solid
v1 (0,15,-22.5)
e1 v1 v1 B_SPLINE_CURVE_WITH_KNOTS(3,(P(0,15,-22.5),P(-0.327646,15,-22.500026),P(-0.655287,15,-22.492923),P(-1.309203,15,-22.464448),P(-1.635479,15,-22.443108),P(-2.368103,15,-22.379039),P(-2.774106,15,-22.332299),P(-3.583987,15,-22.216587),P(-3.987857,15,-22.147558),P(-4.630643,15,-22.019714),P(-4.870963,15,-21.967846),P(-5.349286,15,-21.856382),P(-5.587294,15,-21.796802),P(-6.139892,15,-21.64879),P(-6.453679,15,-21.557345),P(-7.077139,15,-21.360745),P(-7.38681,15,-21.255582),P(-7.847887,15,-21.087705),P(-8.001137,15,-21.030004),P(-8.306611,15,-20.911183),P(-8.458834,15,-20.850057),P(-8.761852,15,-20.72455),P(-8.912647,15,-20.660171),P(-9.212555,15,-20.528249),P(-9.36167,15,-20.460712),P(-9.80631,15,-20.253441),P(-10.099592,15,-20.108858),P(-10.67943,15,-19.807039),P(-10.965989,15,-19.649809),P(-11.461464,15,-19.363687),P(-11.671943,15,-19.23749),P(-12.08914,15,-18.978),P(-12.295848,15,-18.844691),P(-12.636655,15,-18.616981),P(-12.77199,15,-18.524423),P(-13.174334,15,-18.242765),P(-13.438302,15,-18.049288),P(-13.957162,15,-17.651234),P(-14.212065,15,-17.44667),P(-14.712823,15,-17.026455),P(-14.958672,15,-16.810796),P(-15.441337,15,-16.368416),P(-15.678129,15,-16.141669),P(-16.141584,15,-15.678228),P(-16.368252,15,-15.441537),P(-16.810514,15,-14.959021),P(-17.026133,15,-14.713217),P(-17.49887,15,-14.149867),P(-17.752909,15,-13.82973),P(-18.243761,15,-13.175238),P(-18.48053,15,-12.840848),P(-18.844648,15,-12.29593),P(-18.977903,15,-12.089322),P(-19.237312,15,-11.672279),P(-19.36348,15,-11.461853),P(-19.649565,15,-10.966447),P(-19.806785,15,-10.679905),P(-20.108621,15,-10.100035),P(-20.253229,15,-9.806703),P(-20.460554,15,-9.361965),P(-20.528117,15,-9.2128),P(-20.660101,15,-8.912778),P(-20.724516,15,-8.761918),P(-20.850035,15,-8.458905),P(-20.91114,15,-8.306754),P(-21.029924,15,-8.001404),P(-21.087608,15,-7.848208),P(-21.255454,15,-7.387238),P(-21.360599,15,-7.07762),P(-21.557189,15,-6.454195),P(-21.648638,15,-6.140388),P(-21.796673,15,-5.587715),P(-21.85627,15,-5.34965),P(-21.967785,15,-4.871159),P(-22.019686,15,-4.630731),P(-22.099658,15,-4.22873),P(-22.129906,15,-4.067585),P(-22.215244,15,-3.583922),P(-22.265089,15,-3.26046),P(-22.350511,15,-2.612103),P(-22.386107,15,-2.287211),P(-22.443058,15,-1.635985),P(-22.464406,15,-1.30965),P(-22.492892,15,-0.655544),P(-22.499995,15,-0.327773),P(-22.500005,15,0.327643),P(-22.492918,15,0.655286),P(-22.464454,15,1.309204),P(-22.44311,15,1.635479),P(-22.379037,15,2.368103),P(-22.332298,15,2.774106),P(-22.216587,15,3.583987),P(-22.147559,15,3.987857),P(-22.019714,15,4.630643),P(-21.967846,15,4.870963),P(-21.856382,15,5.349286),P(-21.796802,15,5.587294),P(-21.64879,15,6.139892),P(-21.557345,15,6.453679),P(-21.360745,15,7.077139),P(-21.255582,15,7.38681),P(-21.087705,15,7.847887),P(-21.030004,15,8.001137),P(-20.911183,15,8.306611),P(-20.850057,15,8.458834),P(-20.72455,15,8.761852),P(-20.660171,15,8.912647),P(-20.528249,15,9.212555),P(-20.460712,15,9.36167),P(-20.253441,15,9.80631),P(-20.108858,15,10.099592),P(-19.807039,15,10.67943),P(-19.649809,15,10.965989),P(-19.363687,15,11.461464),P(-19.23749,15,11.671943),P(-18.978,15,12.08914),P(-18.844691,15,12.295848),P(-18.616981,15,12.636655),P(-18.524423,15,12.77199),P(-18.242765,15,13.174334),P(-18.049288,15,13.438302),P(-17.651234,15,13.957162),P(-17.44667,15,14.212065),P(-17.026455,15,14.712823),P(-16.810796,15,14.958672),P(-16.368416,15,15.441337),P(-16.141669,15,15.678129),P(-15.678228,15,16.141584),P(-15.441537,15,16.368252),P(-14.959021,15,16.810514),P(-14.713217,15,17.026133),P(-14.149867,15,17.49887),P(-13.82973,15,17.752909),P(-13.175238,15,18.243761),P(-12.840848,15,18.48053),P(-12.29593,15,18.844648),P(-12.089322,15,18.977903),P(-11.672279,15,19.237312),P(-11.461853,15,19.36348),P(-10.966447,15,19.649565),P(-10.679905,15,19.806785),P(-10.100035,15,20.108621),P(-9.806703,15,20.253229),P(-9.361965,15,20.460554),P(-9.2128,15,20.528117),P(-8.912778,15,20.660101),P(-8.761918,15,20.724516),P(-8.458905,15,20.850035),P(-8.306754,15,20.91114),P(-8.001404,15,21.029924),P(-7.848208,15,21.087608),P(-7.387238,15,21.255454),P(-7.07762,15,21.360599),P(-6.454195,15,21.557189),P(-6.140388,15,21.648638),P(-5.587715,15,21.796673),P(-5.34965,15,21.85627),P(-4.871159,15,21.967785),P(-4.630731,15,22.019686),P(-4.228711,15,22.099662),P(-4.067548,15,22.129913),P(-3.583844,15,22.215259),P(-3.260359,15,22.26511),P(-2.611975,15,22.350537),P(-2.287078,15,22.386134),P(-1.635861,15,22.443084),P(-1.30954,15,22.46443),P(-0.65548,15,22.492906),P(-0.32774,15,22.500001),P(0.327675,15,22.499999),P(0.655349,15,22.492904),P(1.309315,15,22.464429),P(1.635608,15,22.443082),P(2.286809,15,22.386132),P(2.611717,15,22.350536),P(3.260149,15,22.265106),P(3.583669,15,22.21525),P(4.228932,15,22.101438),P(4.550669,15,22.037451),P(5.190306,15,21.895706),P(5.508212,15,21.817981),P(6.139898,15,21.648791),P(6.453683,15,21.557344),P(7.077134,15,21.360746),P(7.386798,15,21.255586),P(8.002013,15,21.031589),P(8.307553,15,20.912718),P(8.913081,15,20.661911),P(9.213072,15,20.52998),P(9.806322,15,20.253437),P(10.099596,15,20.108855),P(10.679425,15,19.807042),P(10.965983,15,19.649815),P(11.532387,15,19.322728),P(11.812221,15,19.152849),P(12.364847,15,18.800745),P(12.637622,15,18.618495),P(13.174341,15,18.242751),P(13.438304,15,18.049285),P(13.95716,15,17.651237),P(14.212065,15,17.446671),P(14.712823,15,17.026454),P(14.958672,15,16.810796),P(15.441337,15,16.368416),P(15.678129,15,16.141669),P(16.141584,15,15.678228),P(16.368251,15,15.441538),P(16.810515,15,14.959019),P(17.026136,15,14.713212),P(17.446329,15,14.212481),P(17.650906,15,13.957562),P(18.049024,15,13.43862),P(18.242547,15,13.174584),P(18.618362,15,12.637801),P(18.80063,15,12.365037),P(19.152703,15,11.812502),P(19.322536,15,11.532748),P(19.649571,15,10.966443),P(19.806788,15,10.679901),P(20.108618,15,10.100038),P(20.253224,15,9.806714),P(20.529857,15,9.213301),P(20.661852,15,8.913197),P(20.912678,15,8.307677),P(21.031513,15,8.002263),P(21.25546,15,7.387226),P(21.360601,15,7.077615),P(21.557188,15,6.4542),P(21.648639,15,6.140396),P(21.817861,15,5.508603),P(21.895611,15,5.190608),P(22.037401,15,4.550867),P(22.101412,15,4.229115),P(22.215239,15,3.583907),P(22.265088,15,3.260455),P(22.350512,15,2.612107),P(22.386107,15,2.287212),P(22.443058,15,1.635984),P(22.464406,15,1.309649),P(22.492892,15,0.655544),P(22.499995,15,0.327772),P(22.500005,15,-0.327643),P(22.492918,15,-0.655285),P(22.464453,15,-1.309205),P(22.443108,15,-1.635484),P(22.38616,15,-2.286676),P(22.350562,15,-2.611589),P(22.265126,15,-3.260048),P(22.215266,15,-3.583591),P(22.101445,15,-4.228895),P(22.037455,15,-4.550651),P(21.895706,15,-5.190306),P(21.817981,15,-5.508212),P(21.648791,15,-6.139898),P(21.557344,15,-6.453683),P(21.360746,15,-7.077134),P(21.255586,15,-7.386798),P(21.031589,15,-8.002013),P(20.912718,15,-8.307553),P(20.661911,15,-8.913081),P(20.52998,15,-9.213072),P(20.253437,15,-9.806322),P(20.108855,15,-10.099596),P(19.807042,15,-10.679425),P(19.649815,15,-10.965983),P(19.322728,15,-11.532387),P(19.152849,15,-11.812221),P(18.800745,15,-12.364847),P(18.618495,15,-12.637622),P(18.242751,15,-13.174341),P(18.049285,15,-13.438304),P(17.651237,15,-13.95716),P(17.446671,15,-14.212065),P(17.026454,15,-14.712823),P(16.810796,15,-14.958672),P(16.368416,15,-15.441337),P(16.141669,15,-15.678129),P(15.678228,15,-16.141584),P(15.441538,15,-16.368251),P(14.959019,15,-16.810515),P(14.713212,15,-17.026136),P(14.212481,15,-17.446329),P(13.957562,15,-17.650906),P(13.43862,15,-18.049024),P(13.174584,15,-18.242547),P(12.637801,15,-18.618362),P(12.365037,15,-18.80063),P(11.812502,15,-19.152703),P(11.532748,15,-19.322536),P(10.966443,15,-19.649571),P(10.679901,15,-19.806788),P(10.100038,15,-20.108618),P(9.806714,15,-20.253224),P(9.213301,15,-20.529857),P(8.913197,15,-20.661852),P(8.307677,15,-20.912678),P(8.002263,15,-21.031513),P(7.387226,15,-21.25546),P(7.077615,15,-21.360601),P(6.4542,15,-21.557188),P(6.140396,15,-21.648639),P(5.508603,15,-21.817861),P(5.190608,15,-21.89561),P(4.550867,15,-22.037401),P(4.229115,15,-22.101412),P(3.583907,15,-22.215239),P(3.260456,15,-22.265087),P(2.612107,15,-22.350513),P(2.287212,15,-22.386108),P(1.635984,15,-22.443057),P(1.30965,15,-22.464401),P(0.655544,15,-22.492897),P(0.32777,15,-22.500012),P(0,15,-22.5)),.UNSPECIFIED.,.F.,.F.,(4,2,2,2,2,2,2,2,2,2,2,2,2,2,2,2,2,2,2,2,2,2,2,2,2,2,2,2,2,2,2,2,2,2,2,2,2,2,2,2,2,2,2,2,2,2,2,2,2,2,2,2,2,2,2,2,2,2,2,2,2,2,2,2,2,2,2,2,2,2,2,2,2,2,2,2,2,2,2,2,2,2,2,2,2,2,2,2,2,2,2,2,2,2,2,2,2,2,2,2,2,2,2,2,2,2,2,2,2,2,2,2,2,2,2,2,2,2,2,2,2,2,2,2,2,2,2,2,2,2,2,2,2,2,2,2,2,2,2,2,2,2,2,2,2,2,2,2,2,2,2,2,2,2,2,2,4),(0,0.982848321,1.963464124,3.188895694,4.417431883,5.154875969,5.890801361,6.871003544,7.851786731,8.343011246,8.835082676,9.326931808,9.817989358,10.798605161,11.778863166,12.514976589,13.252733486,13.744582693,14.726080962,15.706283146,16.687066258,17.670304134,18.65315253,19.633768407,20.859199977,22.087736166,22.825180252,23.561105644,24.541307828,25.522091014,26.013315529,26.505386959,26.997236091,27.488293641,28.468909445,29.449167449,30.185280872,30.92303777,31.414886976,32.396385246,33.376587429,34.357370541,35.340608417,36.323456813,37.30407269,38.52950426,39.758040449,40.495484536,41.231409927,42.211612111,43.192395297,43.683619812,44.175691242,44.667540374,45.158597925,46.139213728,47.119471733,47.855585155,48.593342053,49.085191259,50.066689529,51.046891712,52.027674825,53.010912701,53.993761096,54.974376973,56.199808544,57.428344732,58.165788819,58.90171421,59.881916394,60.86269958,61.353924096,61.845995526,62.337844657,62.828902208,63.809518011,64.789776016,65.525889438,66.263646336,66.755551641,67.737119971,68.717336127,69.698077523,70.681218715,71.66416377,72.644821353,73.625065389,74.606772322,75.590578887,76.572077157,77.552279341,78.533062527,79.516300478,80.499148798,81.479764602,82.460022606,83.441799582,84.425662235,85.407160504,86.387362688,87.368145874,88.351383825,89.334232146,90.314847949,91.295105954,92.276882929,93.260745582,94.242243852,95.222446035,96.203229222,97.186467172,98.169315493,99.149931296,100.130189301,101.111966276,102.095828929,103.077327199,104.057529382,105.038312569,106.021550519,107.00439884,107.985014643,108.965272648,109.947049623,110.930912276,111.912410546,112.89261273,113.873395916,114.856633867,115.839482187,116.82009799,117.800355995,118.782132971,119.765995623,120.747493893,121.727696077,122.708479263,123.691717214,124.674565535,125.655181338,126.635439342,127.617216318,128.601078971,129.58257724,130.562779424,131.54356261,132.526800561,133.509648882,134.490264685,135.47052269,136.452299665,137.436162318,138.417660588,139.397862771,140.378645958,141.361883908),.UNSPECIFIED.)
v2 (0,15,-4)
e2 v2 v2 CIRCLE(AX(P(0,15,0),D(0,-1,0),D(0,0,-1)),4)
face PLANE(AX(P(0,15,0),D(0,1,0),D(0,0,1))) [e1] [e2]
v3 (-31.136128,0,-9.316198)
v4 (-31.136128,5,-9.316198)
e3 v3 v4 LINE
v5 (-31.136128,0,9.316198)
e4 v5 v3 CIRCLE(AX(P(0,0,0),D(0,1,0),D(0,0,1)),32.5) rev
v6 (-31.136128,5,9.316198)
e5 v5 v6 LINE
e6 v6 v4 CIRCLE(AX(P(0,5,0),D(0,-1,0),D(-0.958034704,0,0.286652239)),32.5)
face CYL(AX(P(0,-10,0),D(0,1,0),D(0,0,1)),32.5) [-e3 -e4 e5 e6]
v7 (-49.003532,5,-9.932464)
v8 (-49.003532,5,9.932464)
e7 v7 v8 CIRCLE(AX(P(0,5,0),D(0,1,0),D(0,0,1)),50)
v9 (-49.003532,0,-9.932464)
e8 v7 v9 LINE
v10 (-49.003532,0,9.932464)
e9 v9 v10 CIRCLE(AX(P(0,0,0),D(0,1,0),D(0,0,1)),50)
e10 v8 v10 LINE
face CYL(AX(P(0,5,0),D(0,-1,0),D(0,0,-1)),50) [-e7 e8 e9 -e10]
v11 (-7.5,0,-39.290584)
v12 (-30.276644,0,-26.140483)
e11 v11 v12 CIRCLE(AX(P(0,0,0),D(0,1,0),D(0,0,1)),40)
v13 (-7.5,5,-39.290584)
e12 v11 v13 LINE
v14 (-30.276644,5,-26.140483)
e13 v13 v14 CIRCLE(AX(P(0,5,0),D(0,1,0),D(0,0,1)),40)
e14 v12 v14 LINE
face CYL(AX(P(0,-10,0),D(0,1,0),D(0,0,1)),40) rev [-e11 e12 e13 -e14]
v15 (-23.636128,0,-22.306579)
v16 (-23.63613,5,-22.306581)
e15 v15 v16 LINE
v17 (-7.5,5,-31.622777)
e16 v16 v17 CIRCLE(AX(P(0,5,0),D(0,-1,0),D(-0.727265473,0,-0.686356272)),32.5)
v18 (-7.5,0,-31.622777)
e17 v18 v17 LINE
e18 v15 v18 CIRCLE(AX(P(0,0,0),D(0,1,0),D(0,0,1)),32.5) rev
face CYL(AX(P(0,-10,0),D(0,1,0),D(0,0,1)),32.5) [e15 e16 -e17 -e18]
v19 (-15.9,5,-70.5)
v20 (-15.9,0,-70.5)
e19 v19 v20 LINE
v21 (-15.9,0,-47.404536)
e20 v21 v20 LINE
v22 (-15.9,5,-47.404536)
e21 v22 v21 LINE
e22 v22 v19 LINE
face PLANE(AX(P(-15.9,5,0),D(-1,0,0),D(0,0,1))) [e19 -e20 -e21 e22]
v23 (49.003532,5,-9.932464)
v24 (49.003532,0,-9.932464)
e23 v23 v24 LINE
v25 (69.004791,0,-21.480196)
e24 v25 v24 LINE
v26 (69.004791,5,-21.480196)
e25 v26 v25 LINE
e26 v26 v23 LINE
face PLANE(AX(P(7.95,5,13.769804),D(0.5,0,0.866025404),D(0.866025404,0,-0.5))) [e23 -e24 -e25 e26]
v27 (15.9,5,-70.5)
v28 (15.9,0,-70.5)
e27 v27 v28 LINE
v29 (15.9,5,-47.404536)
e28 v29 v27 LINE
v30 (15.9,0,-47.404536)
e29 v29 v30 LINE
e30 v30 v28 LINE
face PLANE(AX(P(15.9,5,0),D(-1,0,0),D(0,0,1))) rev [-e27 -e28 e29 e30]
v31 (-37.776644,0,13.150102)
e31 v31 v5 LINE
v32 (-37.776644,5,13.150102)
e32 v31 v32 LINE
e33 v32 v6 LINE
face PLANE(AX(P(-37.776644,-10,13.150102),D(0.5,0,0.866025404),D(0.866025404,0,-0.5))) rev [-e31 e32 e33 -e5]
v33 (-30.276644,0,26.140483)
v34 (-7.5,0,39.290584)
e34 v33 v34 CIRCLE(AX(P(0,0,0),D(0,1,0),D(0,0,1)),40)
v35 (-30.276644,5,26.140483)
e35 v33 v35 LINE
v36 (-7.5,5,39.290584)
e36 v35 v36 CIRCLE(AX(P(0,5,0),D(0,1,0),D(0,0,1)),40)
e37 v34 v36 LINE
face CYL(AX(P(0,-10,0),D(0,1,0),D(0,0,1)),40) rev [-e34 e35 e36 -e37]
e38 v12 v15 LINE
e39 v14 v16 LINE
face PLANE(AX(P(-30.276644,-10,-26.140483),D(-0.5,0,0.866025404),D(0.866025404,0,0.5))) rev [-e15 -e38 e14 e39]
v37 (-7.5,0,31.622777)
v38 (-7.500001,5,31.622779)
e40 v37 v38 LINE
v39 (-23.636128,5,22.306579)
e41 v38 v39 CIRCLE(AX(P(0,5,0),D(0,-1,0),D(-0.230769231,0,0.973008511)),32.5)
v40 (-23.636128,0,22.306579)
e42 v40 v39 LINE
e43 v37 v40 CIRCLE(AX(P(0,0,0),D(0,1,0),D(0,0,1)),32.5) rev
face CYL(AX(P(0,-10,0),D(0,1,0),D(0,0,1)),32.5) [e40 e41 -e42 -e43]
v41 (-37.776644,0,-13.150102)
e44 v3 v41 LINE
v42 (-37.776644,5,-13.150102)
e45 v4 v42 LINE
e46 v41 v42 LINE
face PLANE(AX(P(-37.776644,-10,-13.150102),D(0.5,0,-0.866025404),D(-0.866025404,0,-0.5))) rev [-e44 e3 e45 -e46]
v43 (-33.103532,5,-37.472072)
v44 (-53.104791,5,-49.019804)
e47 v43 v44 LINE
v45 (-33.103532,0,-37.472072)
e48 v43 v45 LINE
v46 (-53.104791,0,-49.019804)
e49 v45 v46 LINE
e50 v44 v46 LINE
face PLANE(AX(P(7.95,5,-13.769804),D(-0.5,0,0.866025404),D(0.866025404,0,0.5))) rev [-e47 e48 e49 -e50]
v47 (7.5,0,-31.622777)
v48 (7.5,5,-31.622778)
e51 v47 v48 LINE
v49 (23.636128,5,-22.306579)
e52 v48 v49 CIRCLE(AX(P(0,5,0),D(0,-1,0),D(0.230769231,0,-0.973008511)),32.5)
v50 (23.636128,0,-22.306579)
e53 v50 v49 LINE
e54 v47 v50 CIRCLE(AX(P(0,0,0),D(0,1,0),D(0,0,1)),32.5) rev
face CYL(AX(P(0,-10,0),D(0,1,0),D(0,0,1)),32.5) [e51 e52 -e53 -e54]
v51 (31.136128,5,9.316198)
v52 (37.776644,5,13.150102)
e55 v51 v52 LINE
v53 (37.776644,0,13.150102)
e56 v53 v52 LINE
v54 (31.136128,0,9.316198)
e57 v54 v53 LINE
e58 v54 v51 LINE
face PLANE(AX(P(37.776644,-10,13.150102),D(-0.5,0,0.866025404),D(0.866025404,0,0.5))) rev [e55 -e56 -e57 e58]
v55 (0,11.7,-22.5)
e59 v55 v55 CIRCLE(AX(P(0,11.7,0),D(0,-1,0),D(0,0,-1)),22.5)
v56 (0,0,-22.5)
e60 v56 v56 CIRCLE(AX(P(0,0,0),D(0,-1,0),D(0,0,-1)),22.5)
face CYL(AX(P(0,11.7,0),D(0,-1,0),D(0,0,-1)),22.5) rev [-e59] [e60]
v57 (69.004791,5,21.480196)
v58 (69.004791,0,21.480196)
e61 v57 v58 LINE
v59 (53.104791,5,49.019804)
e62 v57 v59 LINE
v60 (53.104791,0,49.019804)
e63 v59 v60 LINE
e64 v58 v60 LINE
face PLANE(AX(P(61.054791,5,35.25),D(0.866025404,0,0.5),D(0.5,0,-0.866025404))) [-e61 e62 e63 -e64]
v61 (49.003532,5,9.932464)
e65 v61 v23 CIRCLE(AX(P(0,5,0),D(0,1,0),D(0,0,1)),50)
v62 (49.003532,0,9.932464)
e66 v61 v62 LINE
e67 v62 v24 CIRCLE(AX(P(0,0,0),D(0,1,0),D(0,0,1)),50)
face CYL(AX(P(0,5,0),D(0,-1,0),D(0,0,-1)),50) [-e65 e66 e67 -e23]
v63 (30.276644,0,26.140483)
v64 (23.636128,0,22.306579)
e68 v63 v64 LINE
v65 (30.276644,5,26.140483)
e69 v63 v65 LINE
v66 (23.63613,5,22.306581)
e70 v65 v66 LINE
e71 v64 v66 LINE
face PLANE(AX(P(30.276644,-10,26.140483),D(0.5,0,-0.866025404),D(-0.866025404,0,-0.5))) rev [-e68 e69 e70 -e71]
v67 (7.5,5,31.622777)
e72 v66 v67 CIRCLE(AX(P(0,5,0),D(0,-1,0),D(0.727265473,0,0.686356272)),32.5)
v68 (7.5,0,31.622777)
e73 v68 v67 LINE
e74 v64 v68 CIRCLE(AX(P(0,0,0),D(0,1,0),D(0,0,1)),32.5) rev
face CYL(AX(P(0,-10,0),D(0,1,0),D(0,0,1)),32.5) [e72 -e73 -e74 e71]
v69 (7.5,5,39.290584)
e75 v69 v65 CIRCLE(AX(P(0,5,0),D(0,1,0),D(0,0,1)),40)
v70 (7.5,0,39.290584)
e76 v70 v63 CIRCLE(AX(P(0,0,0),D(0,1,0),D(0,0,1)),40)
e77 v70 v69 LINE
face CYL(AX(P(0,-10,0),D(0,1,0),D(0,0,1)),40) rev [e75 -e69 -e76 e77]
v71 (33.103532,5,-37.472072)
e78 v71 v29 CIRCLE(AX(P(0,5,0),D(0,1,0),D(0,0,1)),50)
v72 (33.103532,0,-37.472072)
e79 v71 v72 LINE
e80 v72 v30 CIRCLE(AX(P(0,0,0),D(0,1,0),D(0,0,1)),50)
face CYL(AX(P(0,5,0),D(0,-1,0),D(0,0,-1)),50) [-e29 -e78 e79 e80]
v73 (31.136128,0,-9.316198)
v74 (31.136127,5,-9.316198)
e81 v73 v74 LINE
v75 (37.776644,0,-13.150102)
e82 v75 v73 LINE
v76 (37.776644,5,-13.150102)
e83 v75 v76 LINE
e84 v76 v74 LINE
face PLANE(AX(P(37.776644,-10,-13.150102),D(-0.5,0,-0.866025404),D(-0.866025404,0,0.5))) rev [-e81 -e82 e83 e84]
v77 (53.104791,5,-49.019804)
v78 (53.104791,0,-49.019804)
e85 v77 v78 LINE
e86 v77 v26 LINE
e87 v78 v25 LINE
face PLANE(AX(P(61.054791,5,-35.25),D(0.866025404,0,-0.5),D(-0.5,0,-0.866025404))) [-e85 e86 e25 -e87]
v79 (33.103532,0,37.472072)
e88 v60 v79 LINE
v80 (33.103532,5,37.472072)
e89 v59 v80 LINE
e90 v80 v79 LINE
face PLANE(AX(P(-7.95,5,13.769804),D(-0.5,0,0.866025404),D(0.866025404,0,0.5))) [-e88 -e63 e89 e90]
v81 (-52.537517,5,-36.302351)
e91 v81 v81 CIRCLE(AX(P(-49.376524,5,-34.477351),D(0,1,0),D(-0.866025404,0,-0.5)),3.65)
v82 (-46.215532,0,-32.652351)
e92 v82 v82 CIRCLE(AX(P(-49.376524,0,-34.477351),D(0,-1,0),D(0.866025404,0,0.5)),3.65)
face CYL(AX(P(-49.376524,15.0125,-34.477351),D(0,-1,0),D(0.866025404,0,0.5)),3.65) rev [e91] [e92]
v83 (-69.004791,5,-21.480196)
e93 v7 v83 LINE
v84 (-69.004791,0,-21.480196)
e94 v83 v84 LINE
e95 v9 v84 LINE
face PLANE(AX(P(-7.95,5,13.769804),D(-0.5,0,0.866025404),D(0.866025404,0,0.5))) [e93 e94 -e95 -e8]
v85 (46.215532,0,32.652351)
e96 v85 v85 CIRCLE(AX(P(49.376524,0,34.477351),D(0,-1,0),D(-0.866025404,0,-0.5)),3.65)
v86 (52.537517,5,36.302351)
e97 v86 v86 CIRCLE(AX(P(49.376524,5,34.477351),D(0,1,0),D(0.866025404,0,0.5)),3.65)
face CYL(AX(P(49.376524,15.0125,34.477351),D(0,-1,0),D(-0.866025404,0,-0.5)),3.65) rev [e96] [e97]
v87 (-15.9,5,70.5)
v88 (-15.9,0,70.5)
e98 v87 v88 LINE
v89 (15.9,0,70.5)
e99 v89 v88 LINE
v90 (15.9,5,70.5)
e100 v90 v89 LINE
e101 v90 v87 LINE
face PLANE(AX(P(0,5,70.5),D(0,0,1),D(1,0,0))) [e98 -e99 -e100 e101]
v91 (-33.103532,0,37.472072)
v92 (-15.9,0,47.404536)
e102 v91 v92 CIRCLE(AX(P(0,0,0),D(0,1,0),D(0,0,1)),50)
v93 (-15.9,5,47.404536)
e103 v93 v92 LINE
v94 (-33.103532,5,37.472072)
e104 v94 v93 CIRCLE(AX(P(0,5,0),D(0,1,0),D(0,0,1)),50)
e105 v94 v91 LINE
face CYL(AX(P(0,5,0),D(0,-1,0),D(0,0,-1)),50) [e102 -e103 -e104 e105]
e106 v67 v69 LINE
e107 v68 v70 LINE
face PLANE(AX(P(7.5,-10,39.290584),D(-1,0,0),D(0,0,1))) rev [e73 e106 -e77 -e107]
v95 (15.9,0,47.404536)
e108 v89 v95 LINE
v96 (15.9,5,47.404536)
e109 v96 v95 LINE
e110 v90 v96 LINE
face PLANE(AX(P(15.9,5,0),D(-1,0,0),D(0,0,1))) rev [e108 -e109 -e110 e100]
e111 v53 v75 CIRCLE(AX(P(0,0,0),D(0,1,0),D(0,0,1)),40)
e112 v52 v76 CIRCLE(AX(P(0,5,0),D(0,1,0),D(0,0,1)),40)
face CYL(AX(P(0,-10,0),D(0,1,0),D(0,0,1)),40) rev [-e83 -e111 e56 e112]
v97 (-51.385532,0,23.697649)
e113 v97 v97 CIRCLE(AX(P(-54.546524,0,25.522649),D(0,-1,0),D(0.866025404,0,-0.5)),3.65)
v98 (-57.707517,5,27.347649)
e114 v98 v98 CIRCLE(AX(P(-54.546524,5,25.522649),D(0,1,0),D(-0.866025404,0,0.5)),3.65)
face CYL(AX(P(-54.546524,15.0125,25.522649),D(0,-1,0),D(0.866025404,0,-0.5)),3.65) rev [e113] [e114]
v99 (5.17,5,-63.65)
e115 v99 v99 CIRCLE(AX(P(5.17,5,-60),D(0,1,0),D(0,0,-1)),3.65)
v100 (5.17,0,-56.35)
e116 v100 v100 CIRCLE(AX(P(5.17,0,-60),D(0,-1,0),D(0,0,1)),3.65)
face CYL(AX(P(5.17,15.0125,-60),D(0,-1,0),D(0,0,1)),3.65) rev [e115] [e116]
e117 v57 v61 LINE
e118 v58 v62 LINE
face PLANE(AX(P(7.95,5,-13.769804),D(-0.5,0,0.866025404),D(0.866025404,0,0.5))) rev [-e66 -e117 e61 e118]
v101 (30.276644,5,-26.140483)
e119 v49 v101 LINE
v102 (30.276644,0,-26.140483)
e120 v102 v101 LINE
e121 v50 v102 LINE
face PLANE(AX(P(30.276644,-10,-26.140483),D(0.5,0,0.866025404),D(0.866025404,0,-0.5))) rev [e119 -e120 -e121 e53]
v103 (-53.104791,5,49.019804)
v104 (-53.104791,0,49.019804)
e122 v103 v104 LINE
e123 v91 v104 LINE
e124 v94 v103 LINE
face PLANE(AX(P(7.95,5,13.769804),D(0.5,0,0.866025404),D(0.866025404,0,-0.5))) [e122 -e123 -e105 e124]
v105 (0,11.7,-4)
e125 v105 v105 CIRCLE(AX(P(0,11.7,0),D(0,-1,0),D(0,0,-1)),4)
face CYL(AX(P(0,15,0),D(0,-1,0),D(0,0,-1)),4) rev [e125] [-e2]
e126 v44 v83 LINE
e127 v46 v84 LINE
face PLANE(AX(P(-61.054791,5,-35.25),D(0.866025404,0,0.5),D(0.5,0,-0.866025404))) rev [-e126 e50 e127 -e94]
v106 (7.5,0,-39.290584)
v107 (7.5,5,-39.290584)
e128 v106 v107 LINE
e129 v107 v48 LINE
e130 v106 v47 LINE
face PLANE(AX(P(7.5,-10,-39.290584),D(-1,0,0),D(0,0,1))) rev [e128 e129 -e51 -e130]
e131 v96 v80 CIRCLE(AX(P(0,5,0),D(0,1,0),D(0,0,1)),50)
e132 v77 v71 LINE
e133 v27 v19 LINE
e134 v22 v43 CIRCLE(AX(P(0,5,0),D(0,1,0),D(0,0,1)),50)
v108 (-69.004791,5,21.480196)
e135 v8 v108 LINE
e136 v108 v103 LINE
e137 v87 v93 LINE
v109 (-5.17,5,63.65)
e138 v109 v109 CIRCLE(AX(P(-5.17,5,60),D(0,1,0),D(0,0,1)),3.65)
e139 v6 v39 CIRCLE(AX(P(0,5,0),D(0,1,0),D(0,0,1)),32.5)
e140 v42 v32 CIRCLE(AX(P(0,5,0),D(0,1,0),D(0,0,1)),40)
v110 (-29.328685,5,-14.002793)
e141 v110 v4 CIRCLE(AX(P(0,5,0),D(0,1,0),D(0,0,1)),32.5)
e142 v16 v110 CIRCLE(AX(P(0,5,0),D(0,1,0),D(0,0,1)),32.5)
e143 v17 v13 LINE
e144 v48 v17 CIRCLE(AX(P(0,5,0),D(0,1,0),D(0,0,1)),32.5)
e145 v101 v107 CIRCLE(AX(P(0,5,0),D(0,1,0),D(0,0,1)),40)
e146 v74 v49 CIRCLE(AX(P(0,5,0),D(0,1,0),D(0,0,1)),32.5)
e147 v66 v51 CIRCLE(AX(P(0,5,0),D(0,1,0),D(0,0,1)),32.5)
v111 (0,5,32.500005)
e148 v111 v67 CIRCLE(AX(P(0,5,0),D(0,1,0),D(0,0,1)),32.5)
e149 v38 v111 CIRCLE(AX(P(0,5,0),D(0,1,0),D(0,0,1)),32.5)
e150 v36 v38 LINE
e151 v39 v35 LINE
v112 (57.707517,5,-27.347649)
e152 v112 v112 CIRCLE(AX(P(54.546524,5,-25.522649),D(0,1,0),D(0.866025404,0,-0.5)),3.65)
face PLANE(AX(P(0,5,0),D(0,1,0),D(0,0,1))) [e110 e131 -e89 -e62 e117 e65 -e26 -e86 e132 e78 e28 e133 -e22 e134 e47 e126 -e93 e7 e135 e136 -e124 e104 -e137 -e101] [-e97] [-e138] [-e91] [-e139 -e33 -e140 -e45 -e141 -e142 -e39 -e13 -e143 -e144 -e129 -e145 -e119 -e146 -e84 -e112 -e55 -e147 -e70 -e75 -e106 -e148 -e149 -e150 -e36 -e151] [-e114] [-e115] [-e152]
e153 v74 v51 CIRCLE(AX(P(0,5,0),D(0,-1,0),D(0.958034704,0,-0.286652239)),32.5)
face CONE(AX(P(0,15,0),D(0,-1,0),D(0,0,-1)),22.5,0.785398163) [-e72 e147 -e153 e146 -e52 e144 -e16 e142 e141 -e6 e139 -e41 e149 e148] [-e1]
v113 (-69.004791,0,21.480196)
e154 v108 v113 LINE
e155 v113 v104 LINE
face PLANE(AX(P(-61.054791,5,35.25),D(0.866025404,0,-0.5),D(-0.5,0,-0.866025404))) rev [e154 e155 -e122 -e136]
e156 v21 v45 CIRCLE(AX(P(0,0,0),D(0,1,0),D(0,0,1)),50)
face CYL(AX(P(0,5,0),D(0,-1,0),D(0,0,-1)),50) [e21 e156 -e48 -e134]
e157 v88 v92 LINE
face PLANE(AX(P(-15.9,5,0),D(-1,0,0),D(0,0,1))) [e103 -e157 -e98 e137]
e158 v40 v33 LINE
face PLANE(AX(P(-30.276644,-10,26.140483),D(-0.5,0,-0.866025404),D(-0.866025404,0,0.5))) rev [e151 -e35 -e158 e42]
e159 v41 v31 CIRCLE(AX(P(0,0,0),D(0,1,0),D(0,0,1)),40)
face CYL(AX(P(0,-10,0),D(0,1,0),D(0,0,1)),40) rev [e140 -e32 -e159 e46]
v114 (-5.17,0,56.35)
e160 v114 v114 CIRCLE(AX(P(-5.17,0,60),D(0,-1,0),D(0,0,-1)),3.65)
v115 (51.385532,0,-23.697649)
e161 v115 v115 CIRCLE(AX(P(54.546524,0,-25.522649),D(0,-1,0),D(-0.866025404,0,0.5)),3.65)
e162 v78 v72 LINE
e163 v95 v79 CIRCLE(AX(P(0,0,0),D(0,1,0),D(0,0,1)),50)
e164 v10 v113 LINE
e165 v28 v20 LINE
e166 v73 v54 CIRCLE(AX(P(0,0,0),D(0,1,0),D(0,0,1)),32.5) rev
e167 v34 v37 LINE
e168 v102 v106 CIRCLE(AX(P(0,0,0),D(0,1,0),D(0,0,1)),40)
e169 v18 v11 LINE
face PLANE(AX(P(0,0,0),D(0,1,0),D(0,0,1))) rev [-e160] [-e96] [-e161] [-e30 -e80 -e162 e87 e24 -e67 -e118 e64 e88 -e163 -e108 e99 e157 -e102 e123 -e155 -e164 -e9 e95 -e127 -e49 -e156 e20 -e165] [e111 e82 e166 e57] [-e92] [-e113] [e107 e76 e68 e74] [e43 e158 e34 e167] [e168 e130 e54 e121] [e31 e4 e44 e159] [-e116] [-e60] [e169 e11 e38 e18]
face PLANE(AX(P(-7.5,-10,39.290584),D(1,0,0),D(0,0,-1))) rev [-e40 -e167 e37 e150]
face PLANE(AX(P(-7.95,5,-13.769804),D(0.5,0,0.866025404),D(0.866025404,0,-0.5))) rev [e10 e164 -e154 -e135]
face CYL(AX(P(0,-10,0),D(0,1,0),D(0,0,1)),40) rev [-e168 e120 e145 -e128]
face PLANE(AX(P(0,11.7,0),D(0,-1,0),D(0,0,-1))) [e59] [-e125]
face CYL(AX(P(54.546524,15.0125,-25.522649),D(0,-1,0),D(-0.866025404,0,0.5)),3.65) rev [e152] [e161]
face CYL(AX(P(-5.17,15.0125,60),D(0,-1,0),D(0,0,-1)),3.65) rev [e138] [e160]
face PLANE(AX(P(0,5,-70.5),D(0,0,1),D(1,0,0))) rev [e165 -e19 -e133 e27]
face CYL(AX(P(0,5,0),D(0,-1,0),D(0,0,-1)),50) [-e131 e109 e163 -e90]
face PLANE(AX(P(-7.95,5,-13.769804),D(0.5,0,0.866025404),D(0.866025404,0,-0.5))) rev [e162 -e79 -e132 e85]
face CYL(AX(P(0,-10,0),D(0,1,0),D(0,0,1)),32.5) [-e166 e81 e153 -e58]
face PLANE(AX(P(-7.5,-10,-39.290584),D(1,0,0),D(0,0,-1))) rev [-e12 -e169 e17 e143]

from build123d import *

# Parameters (mm, degrees)
BOSS_EXTRUDE1_DEPTH = 5
CIRPATTERN1_COUNT   = 3
CIRPATTERN1_ANGLE   = 120
SKETCH8_R           = 22.5
BOSS_EXTRUDE4_DEPTH = 10
SKETCH11_R          = 22.5
CUT_EXTRUDE4_DEPTH  = 11.7
SKETCH12_R          = 4
CUT_EXTRUDE5_DEPTH  = 3.3
SKETCH14_R          = 3.65
CUT_EXTRUDE7_DEPTH  = 100.784323589
CIRPATTERN2_COUNT   = 6
CUT_EXTRUDE9_DEPTH  = 15


# Read off the part's stored shape, not the designer's step: Boundary2
with BuildPart() as part:
    # Sketch1 → Boss-Extrude1 (new body)
    with BuildSketch(Plane(origin=(0, 0, 0), x_dir=(1, 0, 0), z_dir=(0, 1, 0))):
        with BuildLine():
            ThreePointArc((-15.9, 47.404535648), (-50, 0), (-15.9, -47.404535648))
            Line((-15.9, -47.404535648), (-15.9, 47.404535648))
        make_face()
        with BuildLine():
            ThreePointArc((-15.9, -47.404535648), (0, -50), (15.9, -47.404535648))
            Line((15.9, -47.404535648), (15.9, 47.404535648))
            ThreePointArc((15.9, 47.404535648), (0, 50), (-15.9, 47.404535648))
            Line((-15.9, 47.404535648), (-15.9, -47.404535648))
        make_face()
        with BuildLine():
            Line((-15.9, -70.5), (15.9, -70.5))
            Line((15.9, -70.5), (15.9, -47.404535648))
            ThreePointArc((15.9, -47.404535648), (0, -50), (-15.9, -47.404535648))
            Line((-15.9, -47.404535648), (-15.9, -70.5))
        make_face()
        with BuildLine():
            ThreePointArc((-15.9, 47.404535648), (0, 50), (15.9, 47.404535648))
            Line((15.9, 47.404535648), (15.9, 70.5))
            Line((15.9, 70.5), (-15.9, 70.5))
            Line((-15.9, 70.5), (-15.9, 47.404535648))
        make_face()
        with BuildLine():
            Line((15.9, 47.404535648), (15.9, -47.404535648))
            ThreePointArc((15.9, -47.404535648), (40.589407485, -29.197602641), (50, 0))
            ThreePointArc((50, 0), (40.589407485, 29.197602641), (15.9, 47.404535648))
        make_face()
    boss_extrude1 = extrude(amount=BOSS_EXTRUDE1_DEPTH)

    # CirPattern1: Boss-Extrude1 ×3 about axis
    cirpattern1_axis = Axis((0, 0, 0), (0, 1, 0))
    for i in range(1, CIRPATTERN1_COUNT):
        add(boss_extrude1.rotate(cirpattern1_axis, i * CIRPATTERN1_ANGLE / (CIRPATTERN1_COUNT - 1)))

    # Sketch8 → Boss-Extrude4 (add)
    with BuildSketch(Plane(origin=(0, 5, 0), x_dir=(1, 0, 0), z_dir=(0, 1, 0))):
        with Locations(Location((0, 0, 0), (0, 0, 270))):
            Circle(SKETCH8_R)
    extrude(amount=BOSS_EXTRUDE4_DEPTH)

    # Boundary2 outline → Boundary2 (revolve)
    with BuildSketch(Plane.XY):
        Polygon((32.5, 5), (22.499998072, 15.000001928), (22.5, 5), align=None)
    revolve(axis=Axis((0, 0, 0), (0, 1, 0)))

    # Sketch11 → Cut-Extrude4 (cut)
    with BuildSketch(Plane.XZ):
        with Locations(Location((0, 0, 0), (0, 0, 270))):
            Circle(SKETCH11_R)
    extrude(amount=-CUT_EXTRUDE4_DEPTH, mode=Mode.SUBTRACT)

    # Sketch12 → Cut-Extrude5 (cut)
    with BuildSketch(Plane.XZ.offset(-11.7)):
        with Locations(Location((0, 0, 0), (0, 0, 270))):
            Circle(SKETCH12_R)
    extrude(amount=-CUT_EXTRUDE5_DEPTH, mode=Mode.SUBTRACT)

    # Sketch14 → Cut-Extrude7 (cut, through all)
    with BuildSketch(Plane(origin=(0, 0, 0), x_dir=(-1, 0, 0), z_dir=(0, -1, 0))):
        with Locations(Location((5.17, -60, 0), (0, 0, 90))):
            Circle(SKETCH14_R)
    cut_extrude7 = extrude(amount=-CUT_EXTRUDE7_DEPTH, mode=Mode.SUBTRACT)

    # CirPattern2: Cut-Extrude7 ×6 about axis
    cirpattern2_axis = Axis((0, 0, 0), (0, 1, 0))
    for i in range(1, CIRPATTERN2_COUNT):
        add(cut_extrude7.rotate(cirpattern2_axis, i * 360 / CIRPATTERN2_COUNT), mode=Mode.SUBTRACT)

    # Sketch15 → Cut-Extrude9 (cut)
    with BuildSketch(Plane(origin=(0, 5, 0), x_dir=(1, 0, 0), z_dir=(0, 1, 0))):
        with BuildLine():
            Line((-37.776643972, 13.150101528), (-31.136127875, 9.316197772))
            ThreePointArc((-31.136127875, 9.316197772), (-32.5, 0), (-31.136127875, -9.316197772))
            Line((-31.136127875, -9.316197772), (-37.776643972, -13.150101528))
            ThreePointArc((-37.776643972, -13.150101528), (-40, 0), (-37.776643972, 13.150101528))
        make_face()
        with BuildLine():
            Line((-30.276643972, 26.140482585), (-23.636127875, 22.306578829))
            ThreePointArc((-23.636127875, 22.306578829), (-16.25, 28.145825623), (-7.5, 31.622776602))
            Line((-7.5, 31.622776602), (-7.5, 39.290584114))
            ThreePointArc((-7.5, 39.290584114), (-20, 34.641016151), (-30.276643972, 26.140482585))
        make_face()
        with BuildLine():
            Line((7.5, 39.290584114), (7.5, 31.622776602))
            ThreePointArc((7.5, 31.622776602), (16.25, 28.145825623), (23.636127875, 22.306578829))
            Line((23.636127875, 22.306578829), (30.276643972, 26.140482585))
            ThreePointArc((30.276643972, 26.140482585), (20, 34.641016151), (7.5, 39.290584114))
        make_face()
        with BuildLine():
            Line((37.776643972, 13.150101528), (31.136127875, 9.316197772))
            ThreePointArc((31.136127875, 9.316197772), (32.5, 0), (31.136127875, -9.316197772))
            Line((31.136127875, -9.316197772), (37.776643972, -13.150101528))
            ThreePointArc((37.776643972, -13.150101528), (40, 0), (37.776643972, 13.150101528))
        make_face()
        with BuildLine():
            Line((30.276643972, -26.140482585), (23.636127875, -22.306578829))
            ThreePointArc((23.636127875, -22.306578829), (16.25, -28.145825623), (7.5, -31.622776602))
            Line((7.5, -31.622776602), (7.5, -39.290584114))
            ThreePointArc((7.5, -39.290584114), (20, -34.641016151), (30.276643972, -26.140482585))
        make_face()
        with BuildLine():
            Line((-7.5, -39.290584114), (-7.5, -31.622776602))
            ThreePointArc((-7.5, -31.622776602), (-16.25, -28.145825623), (-23.636127875, -22.306578829))
            Line((-23.636127875, -22.306578829), (-30.276643972, -26.140482585))
            ThreePointArc((-30.276643972, -26.140482585), (-20, -34.641016151), (-7.5, -39.290584114))
        make_face()
    extrude(amount=-CUT_EXTRUDE9_DEPTH, mode=Mode.SUBTRACT)


solid = part.part
